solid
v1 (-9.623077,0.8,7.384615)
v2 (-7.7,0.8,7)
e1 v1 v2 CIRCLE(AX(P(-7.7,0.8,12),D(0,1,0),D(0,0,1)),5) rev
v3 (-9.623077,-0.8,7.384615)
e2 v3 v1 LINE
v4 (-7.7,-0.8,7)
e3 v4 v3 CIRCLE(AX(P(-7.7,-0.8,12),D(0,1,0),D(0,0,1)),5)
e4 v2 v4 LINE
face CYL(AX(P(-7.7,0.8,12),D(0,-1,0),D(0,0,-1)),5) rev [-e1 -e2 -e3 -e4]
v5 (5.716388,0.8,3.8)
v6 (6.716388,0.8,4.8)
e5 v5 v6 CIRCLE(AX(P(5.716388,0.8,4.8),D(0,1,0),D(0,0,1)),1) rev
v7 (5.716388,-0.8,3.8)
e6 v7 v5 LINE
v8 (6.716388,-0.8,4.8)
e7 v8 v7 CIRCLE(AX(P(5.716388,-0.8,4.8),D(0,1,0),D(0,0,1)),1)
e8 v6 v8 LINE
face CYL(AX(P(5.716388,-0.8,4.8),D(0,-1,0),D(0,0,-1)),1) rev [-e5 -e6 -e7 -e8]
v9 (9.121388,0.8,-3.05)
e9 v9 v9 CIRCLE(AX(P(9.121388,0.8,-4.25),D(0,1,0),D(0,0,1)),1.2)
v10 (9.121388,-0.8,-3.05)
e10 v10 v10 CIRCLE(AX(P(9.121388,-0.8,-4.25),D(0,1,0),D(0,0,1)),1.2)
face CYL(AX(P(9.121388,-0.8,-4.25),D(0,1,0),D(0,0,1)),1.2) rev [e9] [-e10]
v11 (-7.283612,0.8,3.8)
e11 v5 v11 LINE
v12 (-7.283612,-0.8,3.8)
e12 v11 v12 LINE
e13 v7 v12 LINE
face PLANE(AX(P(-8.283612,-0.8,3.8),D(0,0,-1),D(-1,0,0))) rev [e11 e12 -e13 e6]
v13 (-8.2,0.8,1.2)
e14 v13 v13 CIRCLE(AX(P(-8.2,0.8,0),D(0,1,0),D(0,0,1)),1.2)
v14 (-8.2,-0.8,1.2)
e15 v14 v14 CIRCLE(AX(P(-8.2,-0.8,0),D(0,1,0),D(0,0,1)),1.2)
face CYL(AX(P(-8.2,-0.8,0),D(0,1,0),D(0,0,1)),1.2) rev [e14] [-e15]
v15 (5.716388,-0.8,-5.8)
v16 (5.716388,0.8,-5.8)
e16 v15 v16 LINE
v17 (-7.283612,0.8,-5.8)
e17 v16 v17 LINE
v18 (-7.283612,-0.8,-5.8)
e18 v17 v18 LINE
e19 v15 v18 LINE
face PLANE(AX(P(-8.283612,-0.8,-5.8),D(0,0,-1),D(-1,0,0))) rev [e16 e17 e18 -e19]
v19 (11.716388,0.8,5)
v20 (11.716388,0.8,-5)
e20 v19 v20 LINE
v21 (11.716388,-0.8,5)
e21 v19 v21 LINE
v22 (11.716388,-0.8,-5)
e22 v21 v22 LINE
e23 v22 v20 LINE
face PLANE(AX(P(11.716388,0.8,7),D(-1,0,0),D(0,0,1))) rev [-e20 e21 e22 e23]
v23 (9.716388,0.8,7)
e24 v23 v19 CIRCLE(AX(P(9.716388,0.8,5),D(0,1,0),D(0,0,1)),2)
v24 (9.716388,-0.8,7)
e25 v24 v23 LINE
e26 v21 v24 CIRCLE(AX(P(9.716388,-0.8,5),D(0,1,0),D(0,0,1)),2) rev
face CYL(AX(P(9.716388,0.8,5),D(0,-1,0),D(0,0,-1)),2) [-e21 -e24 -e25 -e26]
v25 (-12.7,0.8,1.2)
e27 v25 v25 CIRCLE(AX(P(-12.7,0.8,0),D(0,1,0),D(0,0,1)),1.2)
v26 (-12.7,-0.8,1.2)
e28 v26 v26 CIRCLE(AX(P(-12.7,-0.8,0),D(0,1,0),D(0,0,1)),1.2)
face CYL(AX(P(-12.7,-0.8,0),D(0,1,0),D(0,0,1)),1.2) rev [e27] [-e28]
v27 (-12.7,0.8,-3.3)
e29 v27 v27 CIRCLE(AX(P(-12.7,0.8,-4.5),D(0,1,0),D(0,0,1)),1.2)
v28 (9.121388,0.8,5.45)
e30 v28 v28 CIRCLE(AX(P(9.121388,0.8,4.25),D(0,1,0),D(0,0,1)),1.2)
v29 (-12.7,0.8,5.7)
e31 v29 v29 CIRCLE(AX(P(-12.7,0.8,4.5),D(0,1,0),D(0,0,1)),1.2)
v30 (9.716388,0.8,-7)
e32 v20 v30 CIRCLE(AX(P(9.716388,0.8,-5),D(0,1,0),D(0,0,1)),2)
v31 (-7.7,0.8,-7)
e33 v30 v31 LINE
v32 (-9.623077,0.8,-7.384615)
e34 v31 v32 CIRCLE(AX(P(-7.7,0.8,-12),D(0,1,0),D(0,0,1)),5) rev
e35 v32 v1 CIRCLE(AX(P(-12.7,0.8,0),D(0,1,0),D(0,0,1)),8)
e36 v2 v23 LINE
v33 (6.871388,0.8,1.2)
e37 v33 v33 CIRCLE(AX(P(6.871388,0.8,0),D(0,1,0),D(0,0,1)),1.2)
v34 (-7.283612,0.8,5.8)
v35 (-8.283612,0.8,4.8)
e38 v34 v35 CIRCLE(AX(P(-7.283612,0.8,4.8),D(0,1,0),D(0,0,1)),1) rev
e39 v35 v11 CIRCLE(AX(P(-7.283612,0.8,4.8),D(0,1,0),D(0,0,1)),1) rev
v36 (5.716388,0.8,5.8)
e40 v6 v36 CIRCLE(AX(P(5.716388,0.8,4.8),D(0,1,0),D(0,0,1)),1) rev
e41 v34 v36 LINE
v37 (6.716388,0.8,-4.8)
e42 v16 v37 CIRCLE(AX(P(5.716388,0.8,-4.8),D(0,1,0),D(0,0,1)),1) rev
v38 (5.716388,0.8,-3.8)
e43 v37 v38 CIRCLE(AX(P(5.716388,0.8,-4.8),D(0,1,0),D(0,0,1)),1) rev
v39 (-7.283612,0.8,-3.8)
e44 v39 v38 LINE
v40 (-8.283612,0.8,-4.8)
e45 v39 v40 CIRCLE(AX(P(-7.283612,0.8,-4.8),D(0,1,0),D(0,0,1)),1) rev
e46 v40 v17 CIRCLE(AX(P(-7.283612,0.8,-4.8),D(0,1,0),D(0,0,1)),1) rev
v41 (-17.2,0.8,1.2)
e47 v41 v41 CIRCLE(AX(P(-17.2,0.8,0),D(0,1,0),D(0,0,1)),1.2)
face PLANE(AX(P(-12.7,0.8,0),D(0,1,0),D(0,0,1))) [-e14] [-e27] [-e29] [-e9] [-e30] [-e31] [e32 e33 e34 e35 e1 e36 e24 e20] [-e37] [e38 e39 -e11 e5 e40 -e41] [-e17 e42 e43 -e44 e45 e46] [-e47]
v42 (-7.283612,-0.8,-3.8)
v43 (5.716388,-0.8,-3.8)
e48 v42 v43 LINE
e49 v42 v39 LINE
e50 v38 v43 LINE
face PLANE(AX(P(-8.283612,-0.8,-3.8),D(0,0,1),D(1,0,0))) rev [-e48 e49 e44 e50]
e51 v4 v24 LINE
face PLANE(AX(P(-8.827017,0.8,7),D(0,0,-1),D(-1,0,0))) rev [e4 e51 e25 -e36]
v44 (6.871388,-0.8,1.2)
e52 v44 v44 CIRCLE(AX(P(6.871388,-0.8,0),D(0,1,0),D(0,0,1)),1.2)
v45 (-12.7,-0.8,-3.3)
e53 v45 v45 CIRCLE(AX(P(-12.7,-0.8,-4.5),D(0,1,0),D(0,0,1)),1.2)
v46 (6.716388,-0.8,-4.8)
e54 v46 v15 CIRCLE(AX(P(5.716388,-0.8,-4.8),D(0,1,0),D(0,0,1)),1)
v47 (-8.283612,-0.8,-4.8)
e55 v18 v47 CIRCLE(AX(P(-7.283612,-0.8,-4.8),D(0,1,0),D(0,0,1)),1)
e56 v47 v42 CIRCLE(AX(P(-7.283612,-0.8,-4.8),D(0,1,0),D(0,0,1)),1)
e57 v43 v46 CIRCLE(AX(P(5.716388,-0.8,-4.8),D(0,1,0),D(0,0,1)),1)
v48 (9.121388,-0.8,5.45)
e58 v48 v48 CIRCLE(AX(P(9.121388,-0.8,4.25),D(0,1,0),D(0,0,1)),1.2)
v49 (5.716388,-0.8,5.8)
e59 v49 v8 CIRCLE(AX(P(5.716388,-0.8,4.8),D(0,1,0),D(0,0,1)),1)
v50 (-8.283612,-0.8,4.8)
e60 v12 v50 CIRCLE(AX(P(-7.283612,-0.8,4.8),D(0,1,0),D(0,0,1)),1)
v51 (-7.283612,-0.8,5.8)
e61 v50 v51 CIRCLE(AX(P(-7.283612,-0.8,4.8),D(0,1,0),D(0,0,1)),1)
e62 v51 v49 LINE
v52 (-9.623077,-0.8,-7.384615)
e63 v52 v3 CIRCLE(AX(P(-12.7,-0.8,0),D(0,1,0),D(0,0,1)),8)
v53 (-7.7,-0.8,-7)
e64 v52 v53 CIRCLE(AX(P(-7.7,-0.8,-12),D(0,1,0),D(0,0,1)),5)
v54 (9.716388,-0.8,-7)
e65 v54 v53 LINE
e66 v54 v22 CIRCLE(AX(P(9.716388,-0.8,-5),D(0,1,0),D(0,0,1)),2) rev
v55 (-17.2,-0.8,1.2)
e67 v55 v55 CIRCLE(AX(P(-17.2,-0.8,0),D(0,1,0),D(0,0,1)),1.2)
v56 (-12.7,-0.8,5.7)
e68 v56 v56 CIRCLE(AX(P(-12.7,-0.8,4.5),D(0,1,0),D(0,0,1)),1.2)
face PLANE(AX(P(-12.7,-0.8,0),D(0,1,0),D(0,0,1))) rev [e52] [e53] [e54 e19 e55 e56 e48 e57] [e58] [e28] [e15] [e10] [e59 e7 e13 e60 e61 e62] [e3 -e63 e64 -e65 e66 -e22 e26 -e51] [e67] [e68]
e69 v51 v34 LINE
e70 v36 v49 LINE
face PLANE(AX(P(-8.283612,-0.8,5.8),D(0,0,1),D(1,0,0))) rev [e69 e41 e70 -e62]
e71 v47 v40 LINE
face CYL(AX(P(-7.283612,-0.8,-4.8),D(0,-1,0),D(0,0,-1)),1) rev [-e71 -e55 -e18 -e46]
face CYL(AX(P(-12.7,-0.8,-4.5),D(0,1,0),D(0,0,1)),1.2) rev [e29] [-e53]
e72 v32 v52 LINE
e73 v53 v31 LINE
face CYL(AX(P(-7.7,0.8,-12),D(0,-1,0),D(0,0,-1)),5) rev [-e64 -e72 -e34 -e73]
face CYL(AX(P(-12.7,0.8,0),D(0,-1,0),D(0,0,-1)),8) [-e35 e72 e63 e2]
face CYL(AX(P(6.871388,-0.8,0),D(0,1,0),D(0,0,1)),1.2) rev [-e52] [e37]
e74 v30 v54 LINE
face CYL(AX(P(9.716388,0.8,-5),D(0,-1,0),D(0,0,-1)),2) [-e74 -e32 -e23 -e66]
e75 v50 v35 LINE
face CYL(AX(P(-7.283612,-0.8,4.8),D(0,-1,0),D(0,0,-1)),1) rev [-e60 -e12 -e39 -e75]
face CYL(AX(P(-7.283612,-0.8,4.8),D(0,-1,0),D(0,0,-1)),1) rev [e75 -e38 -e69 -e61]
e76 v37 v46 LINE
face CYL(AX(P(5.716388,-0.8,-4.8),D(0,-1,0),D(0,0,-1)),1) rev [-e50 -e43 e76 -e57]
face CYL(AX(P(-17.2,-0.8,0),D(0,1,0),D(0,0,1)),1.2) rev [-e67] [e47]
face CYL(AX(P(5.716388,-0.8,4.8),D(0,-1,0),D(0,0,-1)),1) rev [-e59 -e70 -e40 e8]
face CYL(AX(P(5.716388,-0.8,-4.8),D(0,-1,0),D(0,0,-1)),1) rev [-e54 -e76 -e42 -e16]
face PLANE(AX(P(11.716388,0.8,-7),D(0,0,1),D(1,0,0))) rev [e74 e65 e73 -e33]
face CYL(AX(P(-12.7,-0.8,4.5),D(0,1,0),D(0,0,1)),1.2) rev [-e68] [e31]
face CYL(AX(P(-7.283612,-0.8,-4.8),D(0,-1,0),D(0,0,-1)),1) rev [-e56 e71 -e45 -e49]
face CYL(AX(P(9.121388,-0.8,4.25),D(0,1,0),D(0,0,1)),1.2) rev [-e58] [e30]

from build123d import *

# Parameters (mm, degrees)
BOSS_EXTRUDE1_DEPTH = 0.8
FILLET1_R           = 2
FILLET2_R           = 5
SKETCH2_R           = 1.2
CUT_EXTRUDE1_DEPTH  = 23.249719099
SKETCH3_R           = 1.2
CUT_EXTRUDE2_DEPTH  = 23.249719099
SKETCH5_W           = 15
SKETCH5_H           = 2
CUT_EXTRUDE3_DEPTH  = 23.249719099
FILLET3_R           = 1


with BuildPart() as part:
    # Sketch1 → Boss-Extrude1 (new, symmetric)
    with BuildSketch(Plane(origin=(0, 0, 0), x_dir=(1, 0, 0), z_dir=(0, 1, 0))):
        with BuildLine():
            Line((11.716387939, 7), (-8.827016654, 7))
            ThreePointArc((-8.827016654, 7), (-20.7, 0), (-8.827016654, -7))
            Line((-8.827016654, -7), (11.716387939, -7))
            Line((11.716387939, -7), (11.716387939, 7))
        make_face()
    extrude(amount=BOSS_EXTRUDE1_DEPTH, both=True)

    # Fillet1
    fillet1_edges = [part.edges().sort_by_distance(p)[0] for p in [
        (11.716387939, 0, 7),
        (11.716387939, 0, -7),
    ]]
    fillet(fillet1_edges, radius=FILLET1_R)

    # Fillet2
    fillet2_edges = [part.edges().sort_by_distance(p)[0] for p in [
        (-8.827016654, 0, 7),
        (-8.827016654, 0, -7),
    ]]
    fillet(fillet2_edges, radius=FILLET2_R)

    # Sketch2 → Cut-Extrude1 (cut, through all)
    with BuildSketch(Plane(origin=(0, 0.8, 0), x_dir=(1, 0, 0), z_dir=(0, 1, 0))):
        with Locations(Location((-8.2, 0, 0), (0, 0, 270))):
            Circle(SKETCH2_R)
        with Locations(Location((-12.7, 4.5, 0), (0, 0, 270))):
            Circle(SKETCH2_R)
        with Locations(Location((-17.2, 0, 0), (0, 0, 270))):
            Circle(SKETCH2_R)
        with Locations(Location((-12.7, -4.5, 0), (0, 0, 270))):
            Circle(SKETCH2_R)
        with Locations(Location((-12.7, 0, 0), (0, 0, 270))):
            Circle(SKETCH2_R)
    extrude(amount=-CUT_EXTRUDE1_DEPTH, mode=Mode.SUBTRACT)

    # Sketch3 → Cut-Extrude2 (cut, through all)
    with BuildSketch(Plane(origin=(0, 0.8, 0), x_dir=(1, 0, 0), z_dir=(0, 1, 0))):
        with Locations(Location((9.121387939, 4.25, 0), (0, 0, 270))):
            Circle(SKETCH3_R)
        with Locations(Location((9.121387939, -4.25, 0), (0, 0, 270))):
            Circle(SKETCH3_R)
        with Locations(Location((6.871387939, 0, 0), (0, 0, 270))):
            Circle(SKETCH3_R)
    extrude(amount=-CUT_EXTRUDE2_DEPTH, mode=Mode.SUBTRACT)

    # Sketch5 → Cut-Extrude3 (cut, through all)
    with BuildSketch(Plane(origin=(0, 0.8, 0), x_dir=(1, 0, 0), z_dir=(0, 1, 0))):
        with Locations((-0.783612061, 4.8)):
            Rectangle(SKETCH5_W, SKETCH5_H)
        with Locations((-0.783612061, -4.8)):
            Rectangle(SKETCH5_W, SKETCH5_H)
    extrude(amount=-CUT_EXTRUDE3_DEPTH, mode=Mode.SUBTRACT)

    # Fillet3
    fillet3_edges = [part.edges().sort_by_distance(p)[0] for p in [
        (-8.283612061, 0, 5.8),
        (6.716387939, 0, 5.8),
        (6.716387939, 0, 3.8),
        (-8.283612061, 0, 3.8),
        (-8.283612061, 0, -3.8),
        (6.716387939, 0, -3.8),
        (6.716387939, 0, -5.8),
        (-8.283612061, 0, -5.8),
    ]]
    fillet(fillet3_edges, radius=FILLET3_R - 0.0001)  # a hair under: the kernel refuses the full size


solid = part.part
